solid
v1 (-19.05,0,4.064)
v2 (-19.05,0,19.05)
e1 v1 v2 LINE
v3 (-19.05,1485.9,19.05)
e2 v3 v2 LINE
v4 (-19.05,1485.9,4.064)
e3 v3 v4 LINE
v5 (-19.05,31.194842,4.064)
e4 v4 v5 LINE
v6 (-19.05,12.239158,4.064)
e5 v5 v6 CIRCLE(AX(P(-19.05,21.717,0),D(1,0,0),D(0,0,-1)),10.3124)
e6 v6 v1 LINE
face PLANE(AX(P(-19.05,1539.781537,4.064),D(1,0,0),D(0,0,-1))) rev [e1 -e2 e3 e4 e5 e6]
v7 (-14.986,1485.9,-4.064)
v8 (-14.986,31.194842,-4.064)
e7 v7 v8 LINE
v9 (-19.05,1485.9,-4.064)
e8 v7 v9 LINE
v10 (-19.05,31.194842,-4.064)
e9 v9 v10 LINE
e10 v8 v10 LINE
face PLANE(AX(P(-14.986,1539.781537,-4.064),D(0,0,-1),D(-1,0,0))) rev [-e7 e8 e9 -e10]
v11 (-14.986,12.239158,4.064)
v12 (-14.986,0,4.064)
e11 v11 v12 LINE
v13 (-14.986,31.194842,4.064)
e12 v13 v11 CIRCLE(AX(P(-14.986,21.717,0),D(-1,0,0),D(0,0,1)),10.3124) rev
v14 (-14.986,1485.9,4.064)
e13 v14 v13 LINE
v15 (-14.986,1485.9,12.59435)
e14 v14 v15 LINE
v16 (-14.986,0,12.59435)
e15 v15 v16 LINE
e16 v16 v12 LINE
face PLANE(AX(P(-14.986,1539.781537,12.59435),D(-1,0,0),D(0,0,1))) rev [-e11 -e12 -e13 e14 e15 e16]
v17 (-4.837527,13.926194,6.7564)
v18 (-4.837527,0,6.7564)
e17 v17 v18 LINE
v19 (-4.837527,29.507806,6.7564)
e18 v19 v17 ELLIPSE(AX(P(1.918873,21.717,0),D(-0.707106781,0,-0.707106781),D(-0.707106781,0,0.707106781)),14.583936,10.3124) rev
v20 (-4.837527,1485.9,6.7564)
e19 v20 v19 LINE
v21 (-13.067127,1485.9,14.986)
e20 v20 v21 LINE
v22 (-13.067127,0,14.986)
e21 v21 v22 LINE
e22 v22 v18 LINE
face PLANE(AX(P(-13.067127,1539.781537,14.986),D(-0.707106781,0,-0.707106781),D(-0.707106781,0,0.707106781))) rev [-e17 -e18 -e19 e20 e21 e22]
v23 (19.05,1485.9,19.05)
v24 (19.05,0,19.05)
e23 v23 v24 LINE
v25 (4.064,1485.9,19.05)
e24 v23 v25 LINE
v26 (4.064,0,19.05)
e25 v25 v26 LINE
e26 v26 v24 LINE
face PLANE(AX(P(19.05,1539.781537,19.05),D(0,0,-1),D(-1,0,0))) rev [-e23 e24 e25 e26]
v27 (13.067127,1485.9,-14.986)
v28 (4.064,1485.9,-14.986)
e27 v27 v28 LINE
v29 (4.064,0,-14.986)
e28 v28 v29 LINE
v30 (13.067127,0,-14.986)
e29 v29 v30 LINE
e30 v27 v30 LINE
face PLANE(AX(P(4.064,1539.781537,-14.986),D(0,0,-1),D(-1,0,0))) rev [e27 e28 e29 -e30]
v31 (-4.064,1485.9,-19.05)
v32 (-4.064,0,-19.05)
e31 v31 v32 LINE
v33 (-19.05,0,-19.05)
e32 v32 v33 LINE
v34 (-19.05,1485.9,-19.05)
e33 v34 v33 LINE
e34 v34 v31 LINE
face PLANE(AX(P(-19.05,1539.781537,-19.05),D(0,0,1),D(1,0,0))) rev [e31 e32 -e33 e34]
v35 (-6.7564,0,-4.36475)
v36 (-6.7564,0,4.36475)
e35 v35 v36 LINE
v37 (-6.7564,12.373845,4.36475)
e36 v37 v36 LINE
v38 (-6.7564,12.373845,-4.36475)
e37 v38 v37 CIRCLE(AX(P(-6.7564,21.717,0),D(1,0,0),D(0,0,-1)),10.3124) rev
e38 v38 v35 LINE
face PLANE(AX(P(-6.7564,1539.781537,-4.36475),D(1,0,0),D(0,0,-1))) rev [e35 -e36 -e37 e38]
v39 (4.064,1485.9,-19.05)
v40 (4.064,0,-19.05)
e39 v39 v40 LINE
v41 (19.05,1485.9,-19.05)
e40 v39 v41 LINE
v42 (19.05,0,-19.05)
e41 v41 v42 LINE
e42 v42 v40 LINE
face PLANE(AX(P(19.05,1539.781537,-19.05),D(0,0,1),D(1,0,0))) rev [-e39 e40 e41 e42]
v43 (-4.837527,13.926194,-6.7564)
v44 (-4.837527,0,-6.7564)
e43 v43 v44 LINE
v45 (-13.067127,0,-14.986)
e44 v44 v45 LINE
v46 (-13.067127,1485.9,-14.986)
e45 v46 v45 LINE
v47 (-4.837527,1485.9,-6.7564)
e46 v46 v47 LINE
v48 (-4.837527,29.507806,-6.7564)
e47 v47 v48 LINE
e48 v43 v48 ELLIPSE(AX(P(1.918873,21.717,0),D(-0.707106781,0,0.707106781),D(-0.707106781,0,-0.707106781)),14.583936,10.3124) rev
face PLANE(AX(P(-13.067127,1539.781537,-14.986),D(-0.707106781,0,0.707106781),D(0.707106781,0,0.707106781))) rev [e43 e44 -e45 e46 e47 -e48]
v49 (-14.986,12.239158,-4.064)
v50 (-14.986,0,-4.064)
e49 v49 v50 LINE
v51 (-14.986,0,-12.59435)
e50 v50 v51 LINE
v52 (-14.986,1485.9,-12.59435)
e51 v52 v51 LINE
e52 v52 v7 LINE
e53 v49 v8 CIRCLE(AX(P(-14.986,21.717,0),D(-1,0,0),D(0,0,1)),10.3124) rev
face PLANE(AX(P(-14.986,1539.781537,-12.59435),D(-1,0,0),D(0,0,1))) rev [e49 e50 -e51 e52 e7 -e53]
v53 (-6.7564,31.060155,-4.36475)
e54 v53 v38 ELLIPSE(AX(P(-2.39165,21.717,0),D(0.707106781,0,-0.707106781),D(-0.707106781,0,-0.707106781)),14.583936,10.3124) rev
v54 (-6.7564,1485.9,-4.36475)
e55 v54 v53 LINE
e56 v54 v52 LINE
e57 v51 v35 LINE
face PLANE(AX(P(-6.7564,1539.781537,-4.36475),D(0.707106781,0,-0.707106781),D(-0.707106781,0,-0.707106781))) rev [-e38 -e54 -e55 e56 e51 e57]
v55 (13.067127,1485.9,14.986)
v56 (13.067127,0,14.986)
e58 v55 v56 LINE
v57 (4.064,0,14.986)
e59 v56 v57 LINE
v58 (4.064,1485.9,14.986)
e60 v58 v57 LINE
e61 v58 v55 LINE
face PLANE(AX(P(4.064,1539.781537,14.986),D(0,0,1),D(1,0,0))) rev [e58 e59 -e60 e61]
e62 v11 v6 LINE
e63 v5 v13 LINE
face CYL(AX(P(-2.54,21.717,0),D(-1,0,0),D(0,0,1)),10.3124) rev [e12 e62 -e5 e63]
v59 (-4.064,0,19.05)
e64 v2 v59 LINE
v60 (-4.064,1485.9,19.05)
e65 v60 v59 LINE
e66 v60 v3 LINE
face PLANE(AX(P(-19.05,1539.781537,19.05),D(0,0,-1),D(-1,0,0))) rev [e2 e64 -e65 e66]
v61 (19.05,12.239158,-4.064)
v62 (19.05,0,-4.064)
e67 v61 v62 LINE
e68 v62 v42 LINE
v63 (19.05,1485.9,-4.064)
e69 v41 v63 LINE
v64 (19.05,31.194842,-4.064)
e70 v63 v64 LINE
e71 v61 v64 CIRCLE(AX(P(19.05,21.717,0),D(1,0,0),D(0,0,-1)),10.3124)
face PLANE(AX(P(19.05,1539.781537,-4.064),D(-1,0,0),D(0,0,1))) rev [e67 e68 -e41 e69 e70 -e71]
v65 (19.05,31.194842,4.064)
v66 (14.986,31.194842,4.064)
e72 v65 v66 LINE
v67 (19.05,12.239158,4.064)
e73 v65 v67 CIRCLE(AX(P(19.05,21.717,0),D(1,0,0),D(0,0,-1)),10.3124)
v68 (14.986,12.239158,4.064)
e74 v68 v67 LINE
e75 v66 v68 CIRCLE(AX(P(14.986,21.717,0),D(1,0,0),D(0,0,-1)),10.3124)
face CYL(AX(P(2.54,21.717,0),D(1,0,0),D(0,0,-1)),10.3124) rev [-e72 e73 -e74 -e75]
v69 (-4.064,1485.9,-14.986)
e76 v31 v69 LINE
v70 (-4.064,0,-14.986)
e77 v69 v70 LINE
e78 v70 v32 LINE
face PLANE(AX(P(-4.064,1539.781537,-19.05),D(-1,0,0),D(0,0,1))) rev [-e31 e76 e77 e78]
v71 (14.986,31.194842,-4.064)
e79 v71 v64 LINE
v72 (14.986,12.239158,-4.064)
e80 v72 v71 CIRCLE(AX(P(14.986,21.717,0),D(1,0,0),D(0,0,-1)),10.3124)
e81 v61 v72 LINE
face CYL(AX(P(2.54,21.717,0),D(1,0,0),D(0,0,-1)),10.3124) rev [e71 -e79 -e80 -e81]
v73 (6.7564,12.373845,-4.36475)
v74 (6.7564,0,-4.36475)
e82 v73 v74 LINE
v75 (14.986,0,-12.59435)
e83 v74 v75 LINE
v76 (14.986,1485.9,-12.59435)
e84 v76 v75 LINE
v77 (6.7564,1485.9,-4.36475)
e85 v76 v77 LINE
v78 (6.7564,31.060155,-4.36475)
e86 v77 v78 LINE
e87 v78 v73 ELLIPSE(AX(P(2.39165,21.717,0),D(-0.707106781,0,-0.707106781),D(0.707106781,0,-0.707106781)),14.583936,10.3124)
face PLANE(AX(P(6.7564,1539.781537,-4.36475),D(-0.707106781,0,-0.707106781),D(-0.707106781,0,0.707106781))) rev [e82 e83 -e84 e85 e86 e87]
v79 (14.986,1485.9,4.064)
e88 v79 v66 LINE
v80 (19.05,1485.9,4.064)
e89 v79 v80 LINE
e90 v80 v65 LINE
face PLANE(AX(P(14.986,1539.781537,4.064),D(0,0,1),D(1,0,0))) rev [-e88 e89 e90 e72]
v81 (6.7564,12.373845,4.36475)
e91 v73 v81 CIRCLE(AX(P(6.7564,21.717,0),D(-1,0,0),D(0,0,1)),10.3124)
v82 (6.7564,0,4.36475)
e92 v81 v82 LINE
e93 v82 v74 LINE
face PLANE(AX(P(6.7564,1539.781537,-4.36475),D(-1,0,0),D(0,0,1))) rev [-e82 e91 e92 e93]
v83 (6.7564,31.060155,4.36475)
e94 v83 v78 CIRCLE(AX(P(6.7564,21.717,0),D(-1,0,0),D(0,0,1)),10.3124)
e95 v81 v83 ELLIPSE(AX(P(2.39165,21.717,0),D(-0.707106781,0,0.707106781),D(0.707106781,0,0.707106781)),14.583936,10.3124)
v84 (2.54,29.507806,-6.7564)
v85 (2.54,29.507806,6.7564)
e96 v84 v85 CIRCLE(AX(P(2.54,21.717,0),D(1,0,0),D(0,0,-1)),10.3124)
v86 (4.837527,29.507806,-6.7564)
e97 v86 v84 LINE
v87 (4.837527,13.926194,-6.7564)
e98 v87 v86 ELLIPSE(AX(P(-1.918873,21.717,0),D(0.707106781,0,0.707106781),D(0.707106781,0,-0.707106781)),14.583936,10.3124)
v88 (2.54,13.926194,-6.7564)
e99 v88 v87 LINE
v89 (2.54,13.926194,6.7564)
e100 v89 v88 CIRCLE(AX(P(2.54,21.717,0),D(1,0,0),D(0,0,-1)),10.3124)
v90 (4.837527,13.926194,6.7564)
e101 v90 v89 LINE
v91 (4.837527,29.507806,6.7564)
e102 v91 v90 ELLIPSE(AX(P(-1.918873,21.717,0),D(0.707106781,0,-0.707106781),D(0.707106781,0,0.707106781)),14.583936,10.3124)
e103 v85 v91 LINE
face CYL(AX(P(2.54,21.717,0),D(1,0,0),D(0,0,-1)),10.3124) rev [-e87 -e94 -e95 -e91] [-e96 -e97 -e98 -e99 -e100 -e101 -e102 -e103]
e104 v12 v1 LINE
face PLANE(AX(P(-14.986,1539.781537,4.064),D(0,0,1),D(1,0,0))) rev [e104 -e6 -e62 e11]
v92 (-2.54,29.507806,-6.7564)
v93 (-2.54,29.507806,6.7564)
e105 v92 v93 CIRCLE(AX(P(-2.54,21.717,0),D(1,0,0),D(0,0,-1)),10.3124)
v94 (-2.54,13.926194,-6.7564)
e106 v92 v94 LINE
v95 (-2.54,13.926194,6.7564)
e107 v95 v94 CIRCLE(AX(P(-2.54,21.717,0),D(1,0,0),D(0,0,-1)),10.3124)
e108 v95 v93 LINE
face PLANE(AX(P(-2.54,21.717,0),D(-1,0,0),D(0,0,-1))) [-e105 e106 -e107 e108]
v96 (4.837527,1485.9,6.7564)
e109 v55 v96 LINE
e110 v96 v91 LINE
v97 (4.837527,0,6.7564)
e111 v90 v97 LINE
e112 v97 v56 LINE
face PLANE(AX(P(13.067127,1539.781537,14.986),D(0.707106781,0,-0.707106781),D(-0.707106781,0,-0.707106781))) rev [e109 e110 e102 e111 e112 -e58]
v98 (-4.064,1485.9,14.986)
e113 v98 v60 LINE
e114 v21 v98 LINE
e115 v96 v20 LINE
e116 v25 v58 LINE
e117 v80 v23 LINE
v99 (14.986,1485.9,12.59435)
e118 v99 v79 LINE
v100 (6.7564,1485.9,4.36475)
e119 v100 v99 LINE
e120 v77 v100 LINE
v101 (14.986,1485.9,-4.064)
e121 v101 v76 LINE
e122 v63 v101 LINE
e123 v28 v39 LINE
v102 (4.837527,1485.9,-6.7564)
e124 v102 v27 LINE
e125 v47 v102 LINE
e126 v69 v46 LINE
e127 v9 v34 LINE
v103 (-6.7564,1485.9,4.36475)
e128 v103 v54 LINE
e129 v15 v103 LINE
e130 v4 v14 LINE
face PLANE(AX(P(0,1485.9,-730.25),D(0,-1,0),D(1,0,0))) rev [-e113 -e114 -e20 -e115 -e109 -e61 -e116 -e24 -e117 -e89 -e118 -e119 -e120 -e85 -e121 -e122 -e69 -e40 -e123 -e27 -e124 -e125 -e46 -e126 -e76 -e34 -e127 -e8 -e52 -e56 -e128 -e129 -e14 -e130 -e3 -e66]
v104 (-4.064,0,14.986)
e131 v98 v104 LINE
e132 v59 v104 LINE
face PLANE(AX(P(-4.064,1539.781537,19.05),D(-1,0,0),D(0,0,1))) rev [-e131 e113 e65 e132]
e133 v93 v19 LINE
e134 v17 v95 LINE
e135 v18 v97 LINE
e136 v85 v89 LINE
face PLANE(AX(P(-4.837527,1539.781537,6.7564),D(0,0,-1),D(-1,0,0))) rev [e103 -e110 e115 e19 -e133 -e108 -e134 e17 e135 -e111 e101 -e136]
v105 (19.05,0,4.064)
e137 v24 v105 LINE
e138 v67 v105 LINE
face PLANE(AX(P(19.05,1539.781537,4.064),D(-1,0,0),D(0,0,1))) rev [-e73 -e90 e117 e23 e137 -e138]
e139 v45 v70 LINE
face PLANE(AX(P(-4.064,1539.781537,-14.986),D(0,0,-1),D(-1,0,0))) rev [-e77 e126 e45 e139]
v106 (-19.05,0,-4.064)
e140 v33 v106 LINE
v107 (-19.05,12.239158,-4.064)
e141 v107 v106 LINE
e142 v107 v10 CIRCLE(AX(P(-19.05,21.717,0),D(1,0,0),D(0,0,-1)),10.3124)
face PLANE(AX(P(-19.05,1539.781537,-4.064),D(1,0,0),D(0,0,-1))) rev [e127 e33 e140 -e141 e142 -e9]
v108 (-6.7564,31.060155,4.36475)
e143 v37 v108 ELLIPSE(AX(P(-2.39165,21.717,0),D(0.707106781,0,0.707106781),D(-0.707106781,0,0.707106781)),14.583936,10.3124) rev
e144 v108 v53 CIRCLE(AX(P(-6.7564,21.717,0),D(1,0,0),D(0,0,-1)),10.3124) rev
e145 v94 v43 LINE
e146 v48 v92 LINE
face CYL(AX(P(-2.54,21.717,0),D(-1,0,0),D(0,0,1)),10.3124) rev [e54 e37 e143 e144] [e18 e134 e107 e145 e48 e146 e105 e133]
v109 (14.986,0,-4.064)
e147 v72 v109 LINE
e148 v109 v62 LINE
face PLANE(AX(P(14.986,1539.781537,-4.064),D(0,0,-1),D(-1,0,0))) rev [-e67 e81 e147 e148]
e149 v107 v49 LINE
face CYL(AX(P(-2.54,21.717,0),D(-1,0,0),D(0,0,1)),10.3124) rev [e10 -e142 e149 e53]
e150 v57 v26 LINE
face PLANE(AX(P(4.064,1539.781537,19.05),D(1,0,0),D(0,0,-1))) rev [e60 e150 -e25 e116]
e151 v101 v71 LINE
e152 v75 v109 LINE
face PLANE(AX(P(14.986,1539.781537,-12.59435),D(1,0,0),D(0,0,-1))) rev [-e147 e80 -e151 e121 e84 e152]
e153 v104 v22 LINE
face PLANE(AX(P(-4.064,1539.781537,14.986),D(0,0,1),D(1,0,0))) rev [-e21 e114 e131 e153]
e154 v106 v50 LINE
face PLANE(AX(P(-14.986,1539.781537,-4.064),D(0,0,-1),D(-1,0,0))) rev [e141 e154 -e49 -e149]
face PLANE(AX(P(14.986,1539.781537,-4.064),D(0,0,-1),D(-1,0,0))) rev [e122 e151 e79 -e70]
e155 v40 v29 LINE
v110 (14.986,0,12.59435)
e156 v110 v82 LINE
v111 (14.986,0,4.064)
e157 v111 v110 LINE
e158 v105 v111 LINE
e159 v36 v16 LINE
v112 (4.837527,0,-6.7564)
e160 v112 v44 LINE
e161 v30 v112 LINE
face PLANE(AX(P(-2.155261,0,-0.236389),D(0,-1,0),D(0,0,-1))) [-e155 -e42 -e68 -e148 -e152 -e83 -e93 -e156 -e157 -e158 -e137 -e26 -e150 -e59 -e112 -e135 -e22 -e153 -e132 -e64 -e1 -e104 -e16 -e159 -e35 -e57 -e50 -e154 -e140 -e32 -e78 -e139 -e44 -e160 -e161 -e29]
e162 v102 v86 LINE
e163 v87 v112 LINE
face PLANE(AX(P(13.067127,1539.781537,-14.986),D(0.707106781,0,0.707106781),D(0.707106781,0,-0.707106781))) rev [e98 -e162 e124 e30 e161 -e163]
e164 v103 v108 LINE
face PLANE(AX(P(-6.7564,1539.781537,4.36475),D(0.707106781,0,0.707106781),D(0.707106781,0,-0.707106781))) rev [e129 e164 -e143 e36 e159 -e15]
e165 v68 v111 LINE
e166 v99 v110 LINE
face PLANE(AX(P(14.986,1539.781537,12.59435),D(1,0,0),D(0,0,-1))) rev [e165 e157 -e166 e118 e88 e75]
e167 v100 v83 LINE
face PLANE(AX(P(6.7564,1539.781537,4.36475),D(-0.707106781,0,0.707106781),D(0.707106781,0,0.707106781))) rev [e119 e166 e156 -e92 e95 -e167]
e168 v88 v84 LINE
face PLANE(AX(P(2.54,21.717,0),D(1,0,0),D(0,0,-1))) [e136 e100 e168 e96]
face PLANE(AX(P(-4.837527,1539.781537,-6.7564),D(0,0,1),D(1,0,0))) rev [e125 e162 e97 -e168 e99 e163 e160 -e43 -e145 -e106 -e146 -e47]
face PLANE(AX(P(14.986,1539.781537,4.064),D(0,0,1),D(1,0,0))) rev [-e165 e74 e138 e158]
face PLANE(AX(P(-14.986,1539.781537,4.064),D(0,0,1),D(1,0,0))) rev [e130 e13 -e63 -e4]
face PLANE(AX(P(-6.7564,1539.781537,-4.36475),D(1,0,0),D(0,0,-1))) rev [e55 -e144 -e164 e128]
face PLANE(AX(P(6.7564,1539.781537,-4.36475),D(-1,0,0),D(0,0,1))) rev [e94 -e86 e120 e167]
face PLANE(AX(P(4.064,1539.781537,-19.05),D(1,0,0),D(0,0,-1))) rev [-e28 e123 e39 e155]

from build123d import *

# Parameters (mm, degrees)
EXTRUDE1_DEPTH = 1485.9
SKETCH2_R      = 10.3124
EXTRUDE2_DEPTH = 16.51


# Read off the part's stored shape, not the designer's step: 1515<1>
with BuildPart() as part:
    # Sketch1<2> → Extrude1 (new body)
    with BuildSketch(Plane(origin=(0, 0, 0), x_dir=(1, 0, 0), z_dir=(0, 1, 0))):
        Polygon((-6.7564, 4.364749804), (-6.7564, -4.364749804), (-14.986, -12.594349804), (-14.986, -4.064), (-19.05, -4.064), (-19.05, -19.05), (-4.064, -19.05), (-4.064, -14.986), (-13.067127258, -14.986), (-4.837527258, -6.7564), (4.837527258, -6.7564), (13.067127258, -14.986), (4.064, -14.986), (4.064, -19.05), (19.05, -19.05), (19.05, -4.064), (14.986, -4.064), (14.986, -12.594349804), (6.7564, -4.364749804), (6.7564, 4.364749804), (14.986, 12.594349804), (14.986, 4.064), (19.05, 4.064), (19.05, 19.05), (4.064, 19.05), (4.064, 14.986), (13.067127258, 14.986), (4.837527258, 6.7564), (-4.837527258, 6.7564), (-13.067127258, 14.986), (-4.064, 14.986), (-4.064, 19.05), (-19.05, 19.05), (-19.05, 4.064), (-14.986, 4.064), (-14.986, 12.594349804), align=None)
    extrude(amount=EXTRUDE1_DEPTH)

    # Sketch2 → Extrude2 (cut)
    with BuildSketch(Plane(origin=(19.05, 0, 0), x_dir=(0, 0, -1), z_dir=(1, 0, 0))):
        with Locations(Location((0, 21.717, 0), (0, 0, 310.932724574))):
            Circle(SKETCH2_R)
    extrude2 = extrude(amount=-EXTRUDE2_DEPTH, mode=Mode.SUBTRACT)

    # Mirror1: Extrude2 across plane
    add(extrude2.mirror(Plane(origin=(0, 0, 0), x_dir=(0, 0, 1), z_dir=(1, 0, 0))), mode=Mode.SUBTRACT)


solid = part.part
